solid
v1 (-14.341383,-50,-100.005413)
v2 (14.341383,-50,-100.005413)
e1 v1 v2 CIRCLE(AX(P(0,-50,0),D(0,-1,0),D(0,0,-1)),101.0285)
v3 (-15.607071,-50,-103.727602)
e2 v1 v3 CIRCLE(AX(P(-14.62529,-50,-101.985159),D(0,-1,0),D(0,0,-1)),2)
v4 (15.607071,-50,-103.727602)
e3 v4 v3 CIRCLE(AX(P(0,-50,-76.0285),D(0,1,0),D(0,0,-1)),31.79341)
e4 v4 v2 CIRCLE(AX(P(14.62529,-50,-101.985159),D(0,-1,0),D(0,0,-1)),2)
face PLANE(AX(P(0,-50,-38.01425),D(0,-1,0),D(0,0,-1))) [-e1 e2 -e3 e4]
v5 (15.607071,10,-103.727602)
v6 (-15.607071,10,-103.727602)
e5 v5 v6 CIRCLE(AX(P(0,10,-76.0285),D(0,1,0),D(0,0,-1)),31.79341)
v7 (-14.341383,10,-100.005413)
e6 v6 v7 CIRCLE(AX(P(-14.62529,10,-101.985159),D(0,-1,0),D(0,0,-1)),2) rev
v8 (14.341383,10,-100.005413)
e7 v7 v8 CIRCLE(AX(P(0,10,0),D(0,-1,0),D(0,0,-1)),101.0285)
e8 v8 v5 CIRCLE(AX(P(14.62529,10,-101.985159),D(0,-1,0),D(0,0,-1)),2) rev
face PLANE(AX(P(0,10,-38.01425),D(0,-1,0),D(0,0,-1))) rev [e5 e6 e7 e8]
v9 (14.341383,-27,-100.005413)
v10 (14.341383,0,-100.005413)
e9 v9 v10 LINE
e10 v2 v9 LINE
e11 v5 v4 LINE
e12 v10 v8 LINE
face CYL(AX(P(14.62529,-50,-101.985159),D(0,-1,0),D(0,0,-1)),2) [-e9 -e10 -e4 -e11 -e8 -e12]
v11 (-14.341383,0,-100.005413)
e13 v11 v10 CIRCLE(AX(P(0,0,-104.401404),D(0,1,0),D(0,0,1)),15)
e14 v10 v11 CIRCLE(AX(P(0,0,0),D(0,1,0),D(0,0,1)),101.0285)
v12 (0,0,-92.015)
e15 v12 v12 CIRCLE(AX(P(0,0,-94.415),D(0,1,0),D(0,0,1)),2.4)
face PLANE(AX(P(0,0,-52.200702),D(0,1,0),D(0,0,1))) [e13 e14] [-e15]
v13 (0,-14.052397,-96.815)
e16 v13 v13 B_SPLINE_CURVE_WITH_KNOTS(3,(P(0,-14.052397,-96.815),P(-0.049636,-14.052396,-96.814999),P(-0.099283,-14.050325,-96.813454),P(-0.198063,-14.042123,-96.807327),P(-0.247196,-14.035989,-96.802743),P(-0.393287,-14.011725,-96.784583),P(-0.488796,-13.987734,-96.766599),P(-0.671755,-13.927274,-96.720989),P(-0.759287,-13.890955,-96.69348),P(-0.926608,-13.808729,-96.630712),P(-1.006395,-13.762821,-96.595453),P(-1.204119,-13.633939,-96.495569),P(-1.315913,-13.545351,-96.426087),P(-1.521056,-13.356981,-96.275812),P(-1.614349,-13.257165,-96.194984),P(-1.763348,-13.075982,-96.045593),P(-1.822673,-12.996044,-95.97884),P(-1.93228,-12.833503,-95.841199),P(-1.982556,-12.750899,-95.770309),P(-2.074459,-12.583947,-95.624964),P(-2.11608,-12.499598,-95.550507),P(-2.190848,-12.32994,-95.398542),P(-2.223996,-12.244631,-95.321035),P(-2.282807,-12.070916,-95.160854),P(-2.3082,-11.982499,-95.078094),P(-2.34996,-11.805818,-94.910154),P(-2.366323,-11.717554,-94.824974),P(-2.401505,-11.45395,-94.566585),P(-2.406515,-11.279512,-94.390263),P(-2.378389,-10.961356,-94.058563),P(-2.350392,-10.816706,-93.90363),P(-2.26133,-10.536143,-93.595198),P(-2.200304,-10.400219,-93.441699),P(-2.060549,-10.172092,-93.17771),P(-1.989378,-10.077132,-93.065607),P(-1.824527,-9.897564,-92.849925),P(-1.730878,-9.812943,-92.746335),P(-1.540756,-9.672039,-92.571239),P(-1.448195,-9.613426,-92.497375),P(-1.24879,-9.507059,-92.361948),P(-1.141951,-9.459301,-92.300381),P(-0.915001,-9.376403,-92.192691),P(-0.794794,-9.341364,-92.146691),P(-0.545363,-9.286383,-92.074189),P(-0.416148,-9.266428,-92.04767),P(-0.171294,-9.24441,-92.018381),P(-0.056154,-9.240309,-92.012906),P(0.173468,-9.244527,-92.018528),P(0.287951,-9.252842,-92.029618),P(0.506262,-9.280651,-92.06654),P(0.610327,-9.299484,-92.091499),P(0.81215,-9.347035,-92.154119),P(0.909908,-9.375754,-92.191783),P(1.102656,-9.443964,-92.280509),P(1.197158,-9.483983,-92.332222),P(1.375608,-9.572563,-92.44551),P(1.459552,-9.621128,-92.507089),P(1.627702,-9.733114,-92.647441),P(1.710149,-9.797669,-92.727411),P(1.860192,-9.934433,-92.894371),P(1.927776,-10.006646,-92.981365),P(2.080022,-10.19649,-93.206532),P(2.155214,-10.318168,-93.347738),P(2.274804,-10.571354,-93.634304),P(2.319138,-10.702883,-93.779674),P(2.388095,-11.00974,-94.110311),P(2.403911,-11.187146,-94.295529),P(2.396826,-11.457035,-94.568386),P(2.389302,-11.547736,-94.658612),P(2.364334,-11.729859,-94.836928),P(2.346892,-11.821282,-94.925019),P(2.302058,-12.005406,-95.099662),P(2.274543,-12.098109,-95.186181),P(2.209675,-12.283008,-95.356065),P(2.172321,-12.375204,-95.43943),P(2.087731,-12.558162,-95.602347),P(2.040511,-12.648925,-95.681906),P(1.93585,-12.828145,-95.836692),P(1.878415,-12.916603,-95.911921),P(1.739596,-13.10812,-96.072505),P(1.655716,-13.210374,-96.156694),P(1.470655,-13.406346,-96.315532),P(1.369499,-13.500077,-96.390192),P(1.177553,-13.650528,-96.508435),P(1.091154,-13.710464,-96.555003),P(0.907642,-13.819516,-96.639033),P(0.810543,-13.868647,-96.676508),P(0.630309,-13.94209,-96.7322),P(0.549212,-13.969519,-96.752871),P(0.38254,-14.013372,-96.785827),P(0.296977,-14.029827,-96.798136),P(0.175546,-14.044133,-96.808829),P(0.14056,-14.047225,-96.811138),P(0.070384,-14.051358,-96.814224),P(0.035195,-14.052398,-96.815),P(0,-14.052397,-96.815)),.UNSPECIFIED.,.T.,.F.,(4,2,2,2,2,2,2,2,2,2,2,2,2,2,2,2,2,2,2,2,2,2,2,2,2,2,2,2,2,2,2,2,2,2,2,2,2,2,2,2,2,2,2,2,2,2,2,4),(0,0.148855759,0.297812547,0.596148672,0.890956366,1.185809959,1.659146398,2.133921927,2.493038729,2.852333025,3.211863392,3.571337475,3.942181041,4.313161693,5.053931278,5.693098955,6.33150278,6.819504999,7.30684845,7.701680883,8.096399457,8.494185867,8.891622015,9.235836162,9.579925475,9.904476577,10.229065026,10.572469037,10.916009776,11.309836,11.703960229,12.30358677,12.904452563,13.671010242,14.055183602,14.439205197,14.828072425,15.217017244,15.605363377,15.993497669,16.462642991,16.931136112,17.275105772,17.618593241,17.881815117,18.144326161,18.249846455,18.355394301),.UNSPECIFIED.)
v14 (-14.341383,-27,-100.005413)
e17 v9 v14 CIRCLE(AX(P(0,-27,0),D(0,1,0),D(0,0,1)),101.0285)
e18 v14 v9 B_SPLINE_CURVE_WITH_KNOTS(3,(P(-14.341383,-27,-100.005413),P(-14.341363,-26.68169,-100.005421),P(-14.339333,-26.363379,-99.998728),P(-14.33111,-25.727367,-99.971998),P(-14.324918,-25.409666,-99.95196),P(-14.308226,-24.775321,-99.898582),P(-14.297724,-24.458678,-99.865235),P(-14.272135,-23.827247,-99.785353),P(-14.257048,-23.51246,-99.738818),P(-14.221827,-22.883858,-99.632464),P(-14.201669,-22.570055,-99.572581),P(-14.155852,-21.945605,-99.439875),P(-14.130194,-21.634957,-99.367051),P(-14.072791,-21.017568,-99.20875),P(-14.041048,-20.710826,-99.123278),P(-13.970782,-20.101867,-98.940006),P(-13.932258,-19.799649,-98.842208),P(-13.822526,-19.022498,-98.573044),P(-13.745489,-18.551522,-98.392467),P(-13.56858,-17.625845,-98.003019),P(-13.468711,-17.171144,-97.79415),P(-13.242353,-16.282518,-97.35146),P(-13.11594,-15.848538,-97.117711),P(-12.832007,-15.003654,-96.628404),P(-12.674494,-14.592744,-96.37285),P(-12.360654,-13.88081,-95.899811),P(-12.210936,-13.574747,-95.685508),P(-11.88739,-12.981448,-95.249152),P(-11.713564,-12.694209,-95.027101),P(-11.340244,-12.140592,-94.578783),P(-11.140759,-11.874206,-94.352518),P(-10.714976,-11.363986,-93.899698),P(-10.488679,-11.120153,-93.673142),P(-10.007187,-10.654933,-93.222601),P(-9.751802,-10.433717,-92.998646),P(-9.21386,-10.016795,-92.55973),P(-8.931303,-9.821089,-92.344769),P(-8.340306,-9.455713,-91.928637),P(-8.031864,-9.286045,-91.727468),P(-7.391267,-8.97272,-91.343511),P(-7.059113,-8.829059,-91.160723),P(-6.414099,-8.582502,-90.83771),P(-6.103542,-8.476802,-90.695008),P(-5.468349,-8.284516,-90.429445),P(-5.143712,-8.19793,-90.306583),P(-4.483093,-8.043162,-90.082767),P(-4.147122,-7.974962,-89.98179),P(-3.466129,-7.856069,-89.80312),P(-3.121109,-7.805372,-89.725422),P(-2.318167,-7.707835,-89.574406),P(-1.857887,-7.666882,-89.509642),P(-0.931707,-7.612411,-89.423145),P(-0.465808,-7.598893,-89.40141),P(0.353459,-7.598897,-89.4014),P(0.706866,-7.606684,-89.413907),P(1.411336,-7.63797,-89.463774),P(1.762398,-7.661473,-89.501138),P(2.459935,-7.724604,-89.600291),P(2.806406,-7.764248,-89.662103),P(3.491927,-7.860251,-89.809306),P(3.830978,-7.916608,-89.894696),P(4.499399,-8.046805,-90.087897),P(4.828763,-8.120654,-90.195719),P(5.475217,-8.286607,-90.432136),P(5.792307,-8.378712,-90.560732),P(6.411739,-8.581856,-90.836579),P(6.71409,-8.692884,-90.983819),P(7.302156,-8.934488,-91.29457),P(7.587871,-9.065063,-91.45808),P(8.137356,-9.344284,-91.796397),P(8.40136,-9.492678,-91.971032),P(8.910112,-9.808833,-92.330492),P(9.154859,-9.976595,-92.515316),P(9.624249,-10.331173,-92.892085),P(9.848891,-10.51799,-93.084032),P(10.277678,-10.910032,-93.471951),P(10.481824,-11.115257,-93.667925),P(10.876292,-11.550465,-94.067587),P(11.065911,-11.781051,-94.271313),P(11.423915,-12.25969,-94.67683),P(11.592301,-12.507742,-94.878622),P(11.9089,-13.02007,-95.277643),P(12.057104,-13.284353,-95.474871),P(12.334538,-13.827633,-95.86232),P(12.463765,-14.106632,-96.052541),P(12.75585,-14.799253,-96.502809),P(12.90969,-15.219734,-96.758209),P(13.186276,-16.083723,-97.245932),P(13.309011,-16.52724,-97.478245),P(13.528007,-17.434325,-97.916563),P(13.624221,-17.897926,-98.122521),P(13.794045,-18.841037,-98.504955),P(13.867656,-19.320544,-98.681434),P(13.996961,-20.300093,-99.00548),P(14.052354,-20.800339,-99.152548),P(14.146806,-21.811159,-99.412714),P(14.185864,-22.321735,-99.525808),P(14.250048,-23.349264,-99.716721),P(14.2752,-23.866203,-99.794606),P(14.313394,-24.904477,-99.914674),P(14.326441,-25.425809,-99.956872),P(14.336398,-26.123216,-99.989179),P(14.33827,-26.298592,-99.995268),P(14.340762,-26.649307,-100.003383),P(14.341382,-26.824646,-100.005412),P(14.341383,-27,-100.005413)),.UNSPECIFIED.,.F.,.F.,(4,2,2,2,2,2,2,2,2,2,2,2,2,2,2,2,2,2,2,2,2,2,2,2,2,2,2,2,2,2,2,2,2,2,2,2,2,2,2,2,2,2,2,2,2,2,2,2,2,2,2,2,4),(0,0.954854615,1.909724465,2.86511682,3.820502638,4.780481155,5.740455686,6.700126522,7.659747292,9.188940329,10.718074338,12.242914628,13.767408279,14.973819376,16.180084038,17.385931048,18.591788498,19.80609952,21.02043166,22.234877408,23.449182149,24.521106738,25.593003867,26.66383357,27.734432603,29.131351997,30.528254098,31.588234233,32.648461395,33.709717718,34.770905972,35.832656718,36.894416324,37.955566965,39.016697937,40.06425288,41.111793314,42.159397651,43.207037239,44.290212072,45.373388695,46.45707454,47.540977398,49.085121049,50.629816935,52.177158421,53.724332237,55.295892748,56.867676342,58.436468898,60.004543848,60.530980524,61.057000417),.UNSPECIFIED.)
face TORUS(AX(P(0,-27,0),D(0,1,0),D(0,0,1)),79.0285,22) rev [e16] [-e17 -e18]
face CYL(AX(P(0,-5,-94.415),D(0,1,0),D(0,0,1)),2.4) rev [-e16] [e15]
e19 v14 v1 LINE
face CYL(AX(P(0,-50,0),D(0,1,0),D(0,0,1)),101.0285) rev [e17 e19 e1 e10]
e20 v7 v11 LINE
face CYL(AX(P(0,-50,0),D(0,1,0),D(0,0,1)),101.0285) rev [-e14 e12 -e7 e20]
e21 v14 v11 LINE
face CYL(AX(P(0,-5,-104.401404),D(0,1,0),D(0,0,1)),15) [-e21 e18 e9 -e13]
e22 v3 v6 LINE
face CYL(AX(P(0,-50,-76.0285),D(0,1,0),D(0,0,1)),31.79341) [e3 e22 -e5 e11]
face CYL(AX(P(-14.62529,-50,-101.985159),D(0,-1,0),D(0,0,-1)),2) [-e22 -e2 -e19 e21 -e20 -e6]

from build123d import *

# Parameters (mm, degrees)
BOSS_EXTRUDE1_DEPTH      = 10
BOSS_EXTRUDE1_DEPTH_BACK = 50
FILLET1_R                = 2
BOSS_EXTRUDE2_START      = -5
SKETCH3_R                = 2.4
BOSS_EXTRUDE2_DEPTH      = 5
FILLET2_R                = 22


with BuildPart() as part:
    # Sketch2 → Boss-Extrude1 (new, two sides: drawn at the far end of the back side and taken through both)
    with BuildSketch(Plane(origin=(0, 0, 0), x_dir=(1, 0, 0), z_dir=(0, 1, 0)).offset(-BOSS_EXTRUDE1_DEPTH_BACK)):
        with BuildLine():
            ThreePointArc((-22.5, 98.49115601), (0, 101.0285), (22.5, 98.49115601))
            ThreePointArc((22.5, 98.49115601), (0, 107.821909931), (-22.5, 98.49115601))
        make_face()
    extrude(amount=BOSS_EXTRUDE1_DEPTH + BOSS_EXTRUDE1_DEPTH_BACK)

    # Fillet1
    fillet1_edges = [part.edges().sort_by_distance(p)[0] for p in [
        (22.5, -20, -98.49115601),
        (-22.5, -20, -98.49115601),
    ]]
    fillet(fillet1_edges, radius=FILLET1_R)

    # Sketch3 → Boss-Extrude2 (add)
    with BuildSketch(Plane(origin=(0, 0, 0), x_dir=(1, 0, 0), z_dir=(0, 1, 0)).offset(BOSS_EXTRUDE2_START)):
        with BuildLine():
            ThreePointArc((14.341382747, 100.005412619), (0, 101.0285), (-14.341382747, 100.005412619))
            ThreePointArc((-14.341382747, 100.005412619), (0, 89.401404079), (14.341382747, 100.005412619))
        make_face()
        with Locations(Location((0, 94.415, 0), (0, 0, 270))):
            Circle(SKETCH3_R, mode=Mode.SUBTRACT)
    extrude(amount=BOSS_EXTRUDE2_DEPTH)

    # Fillet2
    # the kernel refuses this fillet: 22 mm, written as the material it adds along each edge
    with BuildSketch(Plane(origin=(0, -5, 0), x_dir=(0.6340991791841111, 0, -0.7732517254801548), z_dir=(0.7732517254801548, 0, 0.6340991791841111))) as fillet2_piece_1_section:
        with BuildLine():
            CenterArc((101.0285 - FILLET2_R, -FILLET2_R), FILLET2_R, 0, 90)
            Line((101.0285 - FILLET2_R, 0), (101.0285, 0))
            Line((101.0285, 0), (101.0285, -FILLET2_R))
        make_face()
    fillet2_piece_1 = revolve(axis=Axis((0, -5, 0), (0, 1, 0)), revolution_arc=78.706408495, mode=Mode.PRIVATE)
    fillet2_piece_1 = fillet2_piece_1 & Plane(origin=(0, -11.179397571, -104.401404079), x_dir=(-0.9560921831070281, 0, 0.29306609732556405), z_dir=(0, -1, 0)) * Cylinder(15, 405, mode=Mode.PRIVATE)
    fillet2_piece_1 = fillet2_piece_1 - Plane(origin=(0, -11.179397571, -94.415), x_dir=(0, 0, 1), z_dir=(0, -1, 0)) * Cylinder(2.4, 405, mode=Mode.PRIVATE)
    add(fillet2_piece_1)


solid = part.part
